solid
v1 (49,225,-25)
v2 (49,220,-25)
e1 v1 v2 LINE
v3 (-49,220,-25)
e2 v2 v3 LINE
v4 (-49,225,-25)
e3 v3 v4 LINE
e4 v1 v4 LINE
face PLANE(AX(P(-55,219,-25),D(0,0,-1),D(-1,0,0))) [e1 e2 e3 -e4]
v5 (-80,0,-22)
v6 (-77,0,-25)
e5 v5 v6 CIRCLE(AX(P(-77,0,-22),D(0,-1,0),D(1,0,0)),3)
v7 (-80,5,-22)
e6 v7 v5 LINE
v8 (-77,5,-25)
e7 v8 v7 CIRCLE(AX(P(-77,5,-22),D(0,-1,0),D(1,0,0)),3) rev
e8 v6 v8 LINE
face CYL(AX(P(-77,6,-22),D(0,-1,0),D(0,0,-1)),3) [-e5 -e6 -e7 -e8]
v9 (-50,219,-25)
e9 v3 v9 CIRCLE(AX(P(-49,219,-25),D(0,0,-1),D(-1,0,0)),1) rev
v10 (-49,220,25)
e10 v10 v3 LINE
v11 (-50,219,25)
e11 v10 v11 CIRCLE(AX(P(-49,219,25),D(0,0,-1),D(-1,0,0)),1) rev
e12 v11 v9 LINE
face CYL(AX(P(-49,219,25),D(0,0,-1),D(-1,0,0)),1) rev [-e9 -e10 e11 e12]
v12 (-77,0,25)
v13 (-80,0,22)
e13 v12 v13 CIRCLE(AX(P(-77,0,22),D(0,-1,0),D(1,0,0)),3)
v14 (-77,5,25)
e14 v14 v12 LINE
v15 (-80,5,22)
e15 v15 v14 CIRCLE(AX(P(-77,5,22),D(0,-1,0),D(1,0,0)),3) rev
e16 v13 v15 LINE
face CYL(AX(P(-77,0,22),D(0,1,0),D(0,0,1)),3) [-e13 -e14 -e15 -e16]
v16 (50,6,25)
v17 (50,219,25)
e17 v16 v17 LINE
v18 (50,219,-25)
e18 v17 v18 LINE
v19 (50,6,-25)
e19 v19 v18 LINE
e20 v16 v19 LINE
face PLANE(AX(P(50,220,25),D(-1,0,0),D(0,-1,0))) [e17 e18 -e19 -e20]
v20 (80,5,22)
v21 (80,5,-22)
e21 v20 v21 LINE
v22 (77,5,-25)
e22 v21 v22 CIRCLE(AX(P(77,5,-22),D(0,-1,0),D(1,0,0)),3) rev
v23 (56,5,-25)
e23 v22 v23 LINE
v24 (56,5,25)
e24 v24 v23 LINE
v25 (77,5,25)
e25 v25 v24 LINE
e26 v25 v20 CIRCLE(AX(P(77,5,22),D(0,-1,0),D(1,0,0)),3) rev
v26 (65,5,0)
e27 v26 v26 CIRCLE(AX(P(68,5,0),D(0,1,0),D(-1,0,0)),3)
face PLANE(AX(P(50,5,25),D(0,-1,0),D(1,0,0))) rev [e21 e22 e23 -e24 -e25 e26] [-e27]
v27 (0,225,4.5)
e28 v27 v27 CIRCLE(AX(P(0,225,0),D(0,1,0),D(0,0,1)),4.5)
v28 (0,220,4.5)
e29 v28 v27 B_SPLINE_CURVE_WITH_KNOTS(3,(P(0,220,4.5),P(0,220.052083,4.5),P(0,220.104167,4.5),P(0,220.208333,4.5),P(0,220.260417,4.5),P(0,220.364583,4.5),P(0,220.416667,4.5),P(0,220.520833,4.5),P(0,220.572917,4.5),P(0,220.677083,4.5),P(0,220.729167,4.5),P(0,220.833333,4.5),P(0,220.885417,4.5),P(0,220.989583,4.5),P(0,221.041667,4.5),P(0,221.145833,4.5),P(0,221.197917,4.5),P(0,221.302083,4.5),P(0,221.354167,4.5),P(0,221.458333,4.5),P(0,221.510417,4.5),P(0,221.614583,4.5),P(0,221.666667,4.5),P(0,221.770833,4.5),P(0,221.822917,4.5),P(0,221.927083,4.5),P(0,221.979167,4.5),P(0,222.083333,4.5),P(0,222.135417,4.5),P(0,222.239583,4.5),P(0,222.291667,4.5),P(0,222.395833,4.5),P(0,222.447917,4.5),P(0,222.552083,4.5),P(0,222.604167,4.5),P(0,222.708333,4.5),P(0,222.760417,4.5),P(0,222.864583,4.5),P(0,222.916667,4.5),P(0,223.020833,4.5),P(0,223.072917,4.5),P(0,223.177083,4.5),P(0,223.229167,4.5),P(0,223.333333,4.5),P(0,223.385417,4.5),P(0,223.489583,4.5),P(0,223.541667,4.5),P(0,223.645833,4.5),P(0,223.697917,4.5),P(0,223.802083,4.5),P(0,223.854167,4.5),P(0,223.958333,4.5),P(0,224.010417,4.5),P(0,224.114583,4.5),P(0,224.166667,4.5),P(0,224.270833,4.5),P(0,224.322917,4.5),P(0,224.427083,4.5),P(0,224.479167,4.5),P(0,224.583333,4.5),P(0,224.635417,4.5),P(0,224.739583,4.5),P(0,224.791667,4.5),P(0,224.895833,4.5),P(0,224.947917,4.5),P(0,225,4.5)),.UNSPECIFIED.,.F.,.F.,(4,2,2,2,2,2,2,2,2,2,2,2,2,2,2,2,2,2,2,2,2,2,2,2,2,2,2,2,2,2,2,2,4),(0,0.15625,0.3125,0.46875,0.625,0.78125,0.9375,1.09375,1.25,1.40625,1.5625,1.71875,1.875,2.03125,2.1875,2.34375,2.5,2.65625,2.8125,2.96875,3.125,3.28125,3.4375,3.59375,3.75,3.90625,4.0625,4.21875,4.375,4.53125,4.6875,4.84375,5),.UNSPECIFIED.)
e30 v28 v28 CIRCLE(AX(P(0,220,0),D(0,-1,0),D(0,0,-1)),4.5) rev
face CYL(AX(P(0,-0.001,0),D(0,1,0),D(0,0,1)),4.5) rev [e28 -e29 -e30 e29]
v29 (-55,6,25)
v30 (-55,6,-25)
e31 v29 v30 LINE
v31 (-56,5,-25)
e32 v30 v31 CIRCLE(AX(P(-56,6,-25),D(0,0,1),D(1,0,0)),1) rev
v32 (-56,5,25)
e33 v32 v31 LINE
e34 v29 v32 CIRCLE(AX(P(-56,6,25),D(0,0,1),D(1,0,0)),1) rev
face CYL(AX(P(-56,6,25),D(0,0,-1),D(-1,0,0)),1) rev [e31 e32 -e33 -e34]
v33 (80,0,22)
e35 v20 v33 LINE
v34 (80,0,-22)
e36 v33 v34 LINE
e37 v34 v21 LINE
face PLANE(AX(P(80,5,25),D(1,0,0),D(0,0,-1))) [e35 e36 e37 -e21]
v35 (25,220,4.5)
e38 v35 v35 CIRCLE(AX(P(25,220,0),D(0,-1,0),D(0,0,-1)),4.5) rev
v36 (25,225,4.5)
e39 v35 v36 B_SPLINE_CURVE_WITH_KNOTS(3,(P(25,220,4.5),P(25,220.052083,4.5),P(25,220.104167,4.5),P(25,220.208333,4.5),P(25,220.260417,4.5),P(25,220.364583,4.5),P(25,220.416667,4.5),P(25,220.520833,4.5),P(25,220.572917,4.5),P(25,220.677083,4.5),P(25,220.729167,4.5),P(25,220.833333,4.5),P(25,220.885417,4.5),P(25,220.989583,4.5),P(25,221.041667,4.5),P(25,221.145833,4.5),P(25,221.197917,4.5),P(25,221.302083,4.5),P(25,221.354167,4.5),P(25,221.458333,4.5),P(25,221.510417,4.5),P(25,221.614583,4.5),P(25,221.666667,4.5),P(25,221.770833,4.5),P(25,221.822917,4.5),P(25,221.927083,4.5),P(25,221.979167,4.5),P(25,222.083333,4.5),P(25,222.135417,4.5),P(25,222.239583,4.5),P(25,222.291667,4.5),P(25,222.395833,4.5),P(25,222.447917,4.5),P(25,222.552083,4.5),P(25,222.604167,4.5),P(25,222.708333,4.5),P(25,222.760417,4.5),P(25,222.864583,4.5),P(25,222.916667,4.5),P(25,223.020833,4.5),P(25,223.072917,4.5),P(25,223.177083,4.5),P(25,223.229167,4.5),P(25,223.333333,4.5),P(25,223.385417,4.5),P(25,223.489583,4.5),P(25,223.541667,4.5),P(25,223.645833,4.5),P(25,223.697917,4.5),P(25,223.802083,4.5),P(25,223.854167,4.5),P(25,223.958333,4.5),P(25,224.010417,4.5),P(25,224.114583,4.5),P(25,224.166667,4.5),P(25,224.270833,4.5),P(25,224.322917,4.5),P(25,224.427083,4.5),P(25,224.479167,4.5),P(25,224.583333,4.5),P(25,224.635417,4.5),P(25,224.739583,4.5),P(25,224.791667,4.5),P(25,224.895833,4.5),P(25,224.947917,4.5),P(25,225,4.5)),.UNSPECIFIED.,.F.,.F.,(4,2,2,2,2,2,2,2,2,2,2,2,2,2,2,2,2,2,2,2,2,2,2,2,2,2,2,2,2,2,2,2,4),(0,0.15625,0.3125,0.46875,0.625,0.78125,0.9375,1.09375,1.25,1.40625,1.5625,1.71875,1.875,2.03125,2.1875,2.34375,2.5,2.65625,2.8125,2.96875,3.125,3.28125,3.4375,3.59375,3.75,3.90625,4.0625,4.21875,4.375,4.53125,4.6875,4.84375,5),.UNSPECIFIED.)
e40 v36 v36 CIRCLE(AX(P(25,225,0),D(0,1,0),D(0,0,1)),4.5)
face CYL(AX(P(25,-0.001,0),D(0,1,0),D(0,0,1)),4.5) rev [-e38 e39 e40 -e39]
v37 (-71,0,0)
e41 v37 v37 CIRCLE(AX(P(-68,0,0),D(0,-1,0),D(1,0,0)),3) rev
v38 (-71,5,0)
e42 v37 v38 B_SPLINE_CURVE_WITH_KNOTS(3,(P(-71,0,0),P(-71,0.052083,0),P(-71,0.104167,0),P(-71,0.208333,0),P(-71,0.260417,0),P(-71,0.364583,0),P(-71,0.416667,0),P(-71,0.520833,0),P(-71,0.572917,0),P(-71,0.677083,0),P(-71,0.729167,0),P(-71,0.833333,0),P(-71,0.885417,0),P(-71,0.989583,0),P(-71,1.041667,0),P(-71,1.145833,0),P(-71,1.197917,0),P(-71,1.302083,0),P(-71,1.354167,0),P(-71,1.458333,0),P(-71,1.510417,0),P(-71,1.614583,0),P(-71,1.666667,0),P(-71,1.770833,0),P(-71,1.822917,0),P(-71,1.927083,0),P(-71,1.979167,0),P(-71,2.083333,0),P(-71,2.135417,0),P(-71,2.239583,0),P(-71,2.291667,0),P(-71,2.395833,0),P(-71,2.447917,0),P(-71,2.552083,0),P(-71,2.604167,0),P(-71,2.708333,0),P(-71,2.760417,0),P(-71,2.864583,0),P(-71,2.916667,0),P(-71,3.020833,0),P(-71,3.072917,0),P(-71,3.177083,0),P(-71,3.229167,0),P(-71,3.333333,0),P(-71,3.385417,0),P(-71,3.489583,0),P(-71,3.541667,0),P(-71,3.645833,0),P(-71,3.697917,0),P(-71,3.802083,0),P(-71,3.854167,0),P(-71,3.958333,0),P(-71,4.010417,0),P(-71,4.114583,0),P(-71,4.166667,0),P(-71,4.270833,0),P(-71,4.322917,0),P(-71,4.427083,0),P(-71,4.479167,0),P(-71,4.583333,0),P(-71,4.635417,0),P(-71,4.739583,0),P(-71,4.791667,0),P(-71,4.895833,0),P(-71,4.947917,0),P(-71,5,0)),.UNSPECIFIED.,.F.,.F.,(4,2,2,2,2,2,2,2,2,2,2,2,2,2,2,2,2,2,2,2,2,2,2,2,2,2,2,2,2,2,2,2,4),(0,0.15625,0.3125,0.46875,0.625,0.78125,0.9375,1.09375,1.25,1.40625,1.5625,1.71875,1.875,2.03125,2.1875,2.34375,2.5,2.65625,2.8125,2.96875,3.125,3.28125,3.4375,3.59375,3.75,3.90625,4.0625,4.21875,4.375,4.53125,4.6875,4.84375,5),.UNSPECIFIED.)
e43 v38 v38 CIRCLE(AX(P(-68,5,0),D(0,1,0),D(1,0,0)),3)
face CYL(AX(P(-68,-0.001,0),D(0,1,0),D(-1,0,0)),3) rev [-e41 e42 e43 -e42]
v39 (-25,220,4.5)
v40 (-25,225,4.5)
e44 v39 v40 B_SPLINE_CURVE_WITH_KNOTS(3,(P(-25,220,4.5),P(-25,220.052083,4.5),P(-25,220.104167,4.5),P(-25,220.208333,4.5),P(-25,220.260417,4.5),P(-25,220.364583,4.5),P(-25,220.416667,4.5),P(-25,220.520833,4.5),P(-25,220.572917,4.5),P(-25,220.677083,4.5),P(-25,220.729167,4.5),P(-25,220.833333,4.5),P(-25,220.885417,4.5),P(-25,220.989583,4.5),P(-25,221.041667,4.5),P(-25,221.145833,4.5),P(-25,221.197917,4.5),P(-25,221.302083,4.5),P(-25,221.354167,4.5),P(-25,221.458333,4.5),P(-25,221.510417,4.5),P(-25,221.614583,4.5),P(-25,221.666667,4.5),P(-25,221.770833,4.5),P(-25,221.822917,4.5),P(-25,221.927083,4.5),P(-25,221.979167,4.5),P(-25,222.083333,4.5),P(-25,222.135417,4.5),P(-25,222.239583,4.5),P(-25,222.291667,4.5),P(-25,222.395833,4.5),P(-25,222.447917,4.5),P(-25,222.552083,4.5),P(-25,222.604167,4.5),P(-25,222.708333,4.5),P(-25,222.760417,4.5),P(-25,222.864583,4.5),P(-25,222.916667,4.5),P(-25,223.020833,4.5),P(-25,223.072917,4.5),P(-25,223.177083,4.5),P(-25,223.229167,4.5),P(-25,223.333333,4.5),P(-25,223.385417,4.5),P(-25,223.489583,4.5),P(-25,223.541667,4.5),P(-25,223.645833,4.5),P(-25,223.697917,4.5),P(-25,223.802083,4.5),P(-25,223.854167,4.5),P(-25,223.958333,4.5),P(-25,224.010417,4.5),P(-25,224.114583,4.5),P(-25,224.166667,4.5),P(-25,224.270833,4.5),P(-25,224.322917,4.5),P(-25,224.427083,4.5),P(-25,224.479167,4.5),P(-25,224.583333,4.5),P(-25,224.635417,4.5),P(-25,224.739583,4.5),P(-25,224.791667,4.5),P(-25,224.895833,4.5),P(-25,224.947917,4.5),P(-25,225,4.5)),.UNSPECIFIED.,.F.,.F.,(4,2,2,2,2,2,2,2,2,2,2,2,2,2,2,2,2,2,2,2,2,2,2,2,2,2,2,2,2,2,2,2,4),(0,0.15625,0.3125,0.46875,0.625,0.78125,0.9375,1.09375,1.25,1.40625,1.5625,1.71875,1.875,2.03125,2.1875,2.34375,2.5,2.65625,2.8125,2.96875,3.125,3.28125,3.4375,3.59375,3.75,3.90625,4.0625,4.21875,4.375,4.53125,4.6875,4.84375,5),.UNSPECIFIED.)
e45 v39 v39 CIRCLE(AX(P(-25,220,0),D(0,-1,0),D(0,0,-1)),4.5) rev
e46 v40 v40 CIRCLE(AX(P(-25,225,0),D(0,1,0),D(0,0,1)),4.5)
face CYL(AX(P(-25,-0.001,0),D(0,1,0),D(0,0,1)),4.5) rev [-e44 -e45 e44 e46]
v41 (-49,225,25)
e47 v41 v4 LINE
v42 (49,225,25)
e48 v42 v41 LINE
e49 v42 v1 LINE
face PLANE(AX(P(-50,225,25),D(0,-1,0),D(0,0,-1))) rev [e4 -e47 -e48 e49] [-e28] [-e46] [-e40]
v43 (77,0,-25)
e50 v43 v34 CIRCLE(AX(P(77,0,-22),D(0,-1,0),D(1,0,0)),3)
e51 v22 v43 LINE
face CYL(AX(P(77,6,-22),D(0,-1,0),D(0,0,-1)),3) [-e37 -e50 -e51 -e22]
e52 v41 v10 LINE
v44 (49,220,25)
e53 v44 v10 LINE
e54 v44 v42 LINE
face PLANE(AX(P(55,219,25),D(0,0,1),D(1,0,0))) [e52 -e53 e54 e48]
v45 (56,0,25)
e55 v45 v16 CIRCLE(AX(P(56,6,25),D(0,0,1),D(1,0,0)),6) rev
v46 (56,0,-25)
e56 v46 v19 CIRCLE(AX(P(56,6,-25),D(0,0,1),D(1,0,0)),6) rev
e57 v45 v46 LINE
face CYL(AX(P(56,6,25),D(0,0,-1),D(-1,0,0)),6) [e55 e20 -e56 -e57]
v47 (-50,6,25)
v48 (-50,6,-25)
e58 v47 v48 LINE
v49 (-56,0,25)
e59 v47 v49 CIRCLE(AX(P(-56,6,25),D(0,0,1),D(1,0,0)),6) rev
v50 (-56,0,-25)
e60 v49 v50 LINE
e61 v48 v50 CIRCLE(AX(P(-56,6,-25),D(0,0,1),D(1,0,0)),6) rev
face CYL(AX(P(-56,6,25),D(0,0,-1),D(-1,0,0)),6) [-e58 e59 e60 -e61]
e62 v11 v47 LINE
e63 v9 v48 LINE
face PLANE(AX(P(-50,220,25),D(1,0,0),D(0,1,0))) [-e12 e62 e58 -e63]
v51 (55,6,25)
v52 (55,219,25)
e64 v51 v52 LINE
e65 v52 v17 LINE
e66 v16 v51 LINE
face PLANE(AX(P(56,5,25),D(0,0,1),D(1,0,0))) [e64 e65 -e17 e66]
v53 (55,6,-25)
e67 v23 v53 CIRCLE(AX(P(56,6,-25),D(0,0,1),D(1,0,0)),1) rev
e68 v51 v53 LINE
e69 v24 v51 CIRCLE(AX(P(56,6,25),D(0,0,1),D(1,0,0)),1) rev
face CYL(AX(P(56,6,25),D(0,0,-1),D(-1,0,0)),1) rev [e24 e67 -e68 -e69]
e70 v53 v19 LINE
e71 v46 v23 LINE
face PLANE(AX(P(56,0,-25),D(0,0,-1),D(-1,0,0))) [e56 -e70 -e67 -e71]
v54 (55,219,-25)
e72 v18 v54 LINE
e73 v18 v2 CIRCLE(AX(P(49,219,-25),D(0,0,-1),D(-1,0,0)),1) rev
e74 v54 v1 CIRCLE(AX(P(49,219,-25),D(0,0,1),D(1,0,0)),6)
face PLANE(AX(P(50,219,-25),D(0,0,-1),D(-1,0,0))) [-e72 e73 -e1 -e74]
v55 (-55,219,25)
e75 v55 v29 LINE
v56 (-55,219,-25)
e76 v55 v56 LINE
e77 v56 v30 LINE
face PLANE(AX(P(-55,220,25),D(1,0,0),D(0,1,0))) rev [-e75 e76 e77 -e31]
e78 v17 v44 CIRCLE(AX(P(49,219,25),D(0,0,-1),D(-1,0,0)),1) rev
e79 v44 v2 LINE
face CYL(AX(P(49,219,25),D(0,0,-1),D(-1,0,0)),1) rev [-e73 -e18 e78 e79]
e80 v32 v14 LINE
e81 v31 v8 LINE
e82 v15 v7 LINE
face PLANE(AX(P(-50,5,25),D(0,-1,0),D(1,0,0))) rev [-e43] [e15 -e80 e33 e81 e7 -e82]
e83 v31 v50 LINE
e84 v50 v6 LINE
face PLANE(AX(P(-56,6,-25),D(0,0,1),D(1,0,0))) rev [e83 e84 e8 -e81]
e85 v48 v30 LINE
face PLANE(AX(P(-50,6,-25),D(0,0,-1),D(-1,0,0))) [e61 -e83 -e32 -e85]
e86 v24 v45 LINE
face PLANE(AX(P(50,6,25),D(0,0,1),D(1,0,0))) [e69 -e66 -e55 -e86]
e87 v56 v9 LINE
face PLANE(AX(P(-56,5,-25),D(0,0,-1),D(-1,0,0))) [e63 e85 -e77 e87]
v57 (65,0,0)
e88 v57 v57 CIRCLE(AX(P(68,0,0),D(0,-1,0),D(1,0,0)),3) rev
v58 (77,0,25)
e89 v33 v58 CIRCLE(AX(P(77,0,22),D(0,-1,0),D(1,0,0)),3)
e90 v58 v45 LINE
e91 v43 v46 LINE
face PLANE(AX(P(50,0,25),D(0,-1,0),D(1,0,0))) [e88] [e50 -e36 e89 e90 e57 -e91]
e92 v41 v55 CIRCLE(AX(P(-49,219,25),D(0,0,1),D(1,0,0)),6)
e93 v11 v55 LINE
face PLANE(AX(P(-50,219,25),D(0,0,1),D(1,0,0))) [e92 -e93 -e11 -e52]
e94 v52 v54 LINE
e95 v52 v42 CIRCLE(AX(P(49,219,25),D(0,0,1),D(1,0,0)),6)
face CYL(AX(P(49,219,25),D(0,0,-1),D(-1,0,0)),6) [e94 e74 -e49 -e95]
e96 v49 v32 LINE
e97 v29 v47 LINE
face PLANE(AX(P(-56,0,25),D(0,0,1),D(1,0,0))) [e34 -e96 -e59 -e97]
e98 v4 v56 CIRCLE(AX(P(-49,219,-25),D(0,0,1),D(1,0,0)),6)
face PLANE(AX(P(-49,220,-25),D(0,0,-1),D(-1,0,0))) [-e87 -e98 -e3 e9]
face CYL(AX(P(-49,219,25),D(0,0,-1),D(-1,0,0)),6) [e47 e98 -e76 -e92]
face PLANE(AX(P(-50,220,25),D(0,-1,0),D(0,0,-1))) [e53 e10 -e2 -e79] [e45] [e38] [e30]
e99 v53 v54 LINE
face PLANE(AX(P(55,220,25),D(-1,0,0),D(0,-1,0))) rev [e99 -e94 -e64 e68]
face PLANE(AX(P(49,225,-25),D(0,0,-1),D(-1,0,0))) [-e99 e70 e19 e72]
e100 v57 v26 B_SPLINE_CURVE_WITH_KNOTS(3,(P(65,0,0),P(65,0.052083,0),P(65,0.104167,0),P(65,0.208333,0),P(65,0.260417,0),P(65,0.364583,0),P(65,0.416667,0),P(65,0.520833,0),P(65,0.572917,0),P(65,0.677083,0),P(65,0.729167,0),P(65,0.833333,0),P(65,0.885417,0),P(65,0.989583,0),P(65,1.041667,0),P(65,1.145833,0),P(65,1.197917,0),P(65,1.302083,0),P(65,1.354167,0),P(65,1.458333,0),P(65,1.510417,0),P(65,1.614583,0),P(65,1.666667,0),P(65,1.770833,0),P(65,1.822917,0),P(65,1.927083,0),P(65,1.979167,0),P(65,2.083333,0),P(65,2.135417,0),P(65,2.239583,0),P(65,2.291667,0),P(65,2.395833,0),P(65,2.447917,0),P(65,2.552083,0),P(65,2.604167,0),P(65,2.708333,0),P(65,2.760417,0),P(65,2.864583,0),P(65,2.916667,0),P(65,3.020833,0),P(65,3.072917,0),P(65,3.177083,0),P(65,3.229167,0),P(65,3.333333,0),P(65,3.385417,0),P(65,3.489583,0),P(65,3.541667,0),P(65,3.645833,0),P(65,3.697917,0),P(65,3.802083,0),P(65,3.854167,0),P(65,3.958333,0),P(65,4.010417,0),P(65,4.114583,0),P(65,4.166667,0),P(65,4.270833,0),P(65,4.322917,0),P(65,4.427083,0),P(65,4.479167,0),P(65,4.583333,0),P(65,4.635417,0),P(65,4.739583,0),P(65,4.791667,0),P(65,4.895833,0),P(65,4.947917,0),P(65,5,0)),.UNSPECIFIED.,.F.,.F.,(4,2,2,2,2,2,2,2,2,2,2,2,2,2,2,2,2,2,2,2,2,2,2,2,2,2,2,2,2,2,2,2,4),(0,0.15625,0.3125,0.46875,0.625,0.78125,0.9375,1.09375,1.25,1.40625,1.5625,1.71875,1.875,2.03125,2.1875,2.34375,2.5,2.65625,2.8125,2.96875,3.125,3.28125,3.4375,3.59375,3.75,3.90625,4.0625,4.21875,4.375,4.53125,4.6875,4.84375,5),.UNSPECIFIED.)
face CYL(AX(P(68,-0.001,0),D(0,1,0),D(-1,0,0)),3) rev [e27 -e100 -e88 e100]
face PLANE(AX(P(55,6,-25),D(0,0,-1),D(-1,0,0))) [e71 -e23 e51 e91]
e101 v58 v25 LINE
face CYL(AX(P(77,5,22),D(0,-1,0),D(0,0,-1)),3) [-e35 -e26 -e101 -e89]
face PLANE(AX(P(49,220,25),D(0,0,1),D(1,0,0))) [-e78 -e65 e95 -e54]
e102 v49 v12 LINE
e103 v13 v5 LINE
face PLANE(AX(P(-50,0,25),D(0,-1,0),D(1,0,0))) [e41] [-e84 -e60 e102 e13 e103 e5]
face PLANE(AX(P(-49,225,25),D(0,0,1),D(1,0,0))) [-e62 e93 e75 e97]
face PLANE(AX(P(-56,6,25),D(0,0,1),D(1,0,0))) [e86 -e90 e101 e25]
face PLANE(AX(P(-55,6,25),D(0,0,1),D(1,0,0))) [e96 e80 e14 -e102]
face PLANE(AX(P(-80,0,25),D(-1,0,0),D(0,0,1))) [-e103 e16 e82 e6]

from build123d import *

# Parameters (mm, degrees)
BASE_FLANGE1_DEPTH = 25
CUT_EXTRUDE1_REACH = 237.425
SKETCH7_R          = 3
CUT_EXTRUDE2_REACH = 242.104
SKETCH8_R          = 4.5
FILLET1_R          = 3


# Sheet-metal steps are written as plain solids
with BuildPart() as part:
    # Sketch1 → Base-Flange1 (new, symmetric)
    with BuildSketch(Plane.XY):
        with BuildLine():
            Line((-80, 0), (-56, 0))
            ThreePointArc((-56, 0), (-51.757359313, 1.757359313), (-50, 6))
            Line((-50, 6), (-50, 219))
            ThreePointArc((-50, 219), (-49.707106781, 219.707106781), (-49, 220))
            Line((-49, 220), (49, 220))
            ThreePointArc((49, 220), (49.707106781, 219.707106781), (50, 219))
            Line((50, 219), (50, 6))
            ThreePointArc((50, 6), (51.757359313, 1.757359313), (56, 0))
            Line((56, 0), (80, 0))
            Line((80, 0), (80, 5))
            Line((80, 5), (56, 5))
            ThreePointArc((56, 5), (55.292893219, 5.292893219), (55, 6))
            Line((55, 6), (55, 219))
            ThreePointArc((55, 219), (53.242640687, 223.242640687), (49, 225))
            Line((49, 225), (-49, 225))
            ThreePointArc((-49, 225), (-53.242640687, 223.242640687), (-55, 219))
            Line((-55, 219), (-55, 6))
            ThreePointArc((-55, 6), (-55.292893219, 5.292893219), (-56, 5))
            Line((-56, 5), (-80, 5))
            Line((-80, 5), (-80, 0))
        make_face()
    extrude(amount=BASE_FLANGE1_DEPTH, both=True)

    # Sketch7 → Cut-Extrude1 (cut, up to next)
    with BuildSketch(Plane(origin=(0, 5, 0), x_dir=(1, 0, 0), z_dir=(0, 1, 0)), mode=Mode.PRIVATE) as cut_extrude1_sk1:
        with Locations(Location((68, 0, 0), (0, 0, 180))):
            Circle(SKETCH7_R)
    cut_extrude1_tool1 = extrude(cut_extrude1_sk1.sketch, amount=-CUT_EXTRUDE1_REACH, mode=Mode.PRIVATE) & part.part
    # Sketch7 → Cut-Extrude1 (cut, up to next)
    with BuildSketch(Plane(origin=(0, 5, 0), x_dir=(1, 0, 0), z_dir=(0, 1, 0)), mode=Mode.PRIVATE) as cut_extrude1_sk2:
        with Locations(Location((-68, 0, 0), (0, 0, 180))):
            Circle(SKETCH7_R)
    cut_extrude1_tool2 = extrude(cut_extrude1_sk2.sketch, amount=-CUT_EXTRUDE1_REACH, mode=Mode.PRIVATE) & part.part
    add(cut_extrude1_tool1.solids().sort_by_distance((68, 5, 0))[0], mode=Mode.SUBTRACT)
    add(cut_extrude1_tool2.solids().sort_by_distance((-68, 5, 0))[0], mode=Mode.SUBTRACT)

    # Sketch8 → Cut-Extrude2 (cut, up to next)
    with BuildSketch(Plane(origin=(0, 225, 0), x_dir=(1, 0, 0), z_dir=(0, 1, 0)), mode=Mode.PRIVATE) as cut_extrude2_sk1:
        with Locations(Location((0, 0, 0), (0, 0, 270))):
            Circle(SKETCH8_R)
    cut_extrude2_tool1 = extrude(cut_extrude2_sk1.sketch, amount=-CUT_EXTRUDE2_REACH, mode=Mode.PRIVATE) & part.part
    # Sketch8 → Cut-Extrude2 (cut, up to next)
    with BuildSketch(Plane(origin=(0, 225, 0), x_dir=(1, 0, 0), z_dir=(0, 1, 0)), mode=Mode.PRIVATE) as cut_extrude2_sk2:
        with Locations(Location((-25, 0, 0), (0, 0, 270))):
            Circle(SKETCH8_R)
    cut_extrude2_tool2 = extrude(cut_extrude2_sk2.sketch, amount=-CUT_EXTRUDE2_REACH, mode=Mode.PRIVATE) & part.part
    # Sketch8 → Cut-Extrude2 (cut, up to next)
    with BuildSketch(Plane(origin=(0, 225, 0), x_dir=(1, 0, 0), z_dir=(0, 1, 0)), mode=Mode.PRIVATE) as cut_extrude2_sk3:
        with Locations(Location((25, 0, 0), (0, 0, 270))):
            Circle(SKETCH8_R)
    cut_extrude2_tool3 = extrude(cut_extrude2_sk3.sketch, amount=-CUT_EXTRUDE2_REACH, mode=Mode.PRIVATE) & part.part
    add(cut_extrude2_tool1.solids().sort_by_distance((0, 225, 0))[0], mode=Mode.SUBTRACT)
    add(cut_extrude2_tool2.solids().sort_by_distance((-25, 225, 0))[0], mode=Mode.SUBTRACT)
    add(cut_extrude2_tool3.solids().sort_by_distance((25, 225, 0))[0], mode=Mode.SUBTRACT)

    # Fillet1
    fillet1_edges = [part.edges().sort_by_distance(p)[0] for p in [
        (80, 2.5, -25),
        (-80, 2.5, -25),
        (80, 2.5, 25),
        (-80, 2.5, 25),
    ]]
    fillet(fillet1_edges, radius=FILLET1_R)


solid = part.part
